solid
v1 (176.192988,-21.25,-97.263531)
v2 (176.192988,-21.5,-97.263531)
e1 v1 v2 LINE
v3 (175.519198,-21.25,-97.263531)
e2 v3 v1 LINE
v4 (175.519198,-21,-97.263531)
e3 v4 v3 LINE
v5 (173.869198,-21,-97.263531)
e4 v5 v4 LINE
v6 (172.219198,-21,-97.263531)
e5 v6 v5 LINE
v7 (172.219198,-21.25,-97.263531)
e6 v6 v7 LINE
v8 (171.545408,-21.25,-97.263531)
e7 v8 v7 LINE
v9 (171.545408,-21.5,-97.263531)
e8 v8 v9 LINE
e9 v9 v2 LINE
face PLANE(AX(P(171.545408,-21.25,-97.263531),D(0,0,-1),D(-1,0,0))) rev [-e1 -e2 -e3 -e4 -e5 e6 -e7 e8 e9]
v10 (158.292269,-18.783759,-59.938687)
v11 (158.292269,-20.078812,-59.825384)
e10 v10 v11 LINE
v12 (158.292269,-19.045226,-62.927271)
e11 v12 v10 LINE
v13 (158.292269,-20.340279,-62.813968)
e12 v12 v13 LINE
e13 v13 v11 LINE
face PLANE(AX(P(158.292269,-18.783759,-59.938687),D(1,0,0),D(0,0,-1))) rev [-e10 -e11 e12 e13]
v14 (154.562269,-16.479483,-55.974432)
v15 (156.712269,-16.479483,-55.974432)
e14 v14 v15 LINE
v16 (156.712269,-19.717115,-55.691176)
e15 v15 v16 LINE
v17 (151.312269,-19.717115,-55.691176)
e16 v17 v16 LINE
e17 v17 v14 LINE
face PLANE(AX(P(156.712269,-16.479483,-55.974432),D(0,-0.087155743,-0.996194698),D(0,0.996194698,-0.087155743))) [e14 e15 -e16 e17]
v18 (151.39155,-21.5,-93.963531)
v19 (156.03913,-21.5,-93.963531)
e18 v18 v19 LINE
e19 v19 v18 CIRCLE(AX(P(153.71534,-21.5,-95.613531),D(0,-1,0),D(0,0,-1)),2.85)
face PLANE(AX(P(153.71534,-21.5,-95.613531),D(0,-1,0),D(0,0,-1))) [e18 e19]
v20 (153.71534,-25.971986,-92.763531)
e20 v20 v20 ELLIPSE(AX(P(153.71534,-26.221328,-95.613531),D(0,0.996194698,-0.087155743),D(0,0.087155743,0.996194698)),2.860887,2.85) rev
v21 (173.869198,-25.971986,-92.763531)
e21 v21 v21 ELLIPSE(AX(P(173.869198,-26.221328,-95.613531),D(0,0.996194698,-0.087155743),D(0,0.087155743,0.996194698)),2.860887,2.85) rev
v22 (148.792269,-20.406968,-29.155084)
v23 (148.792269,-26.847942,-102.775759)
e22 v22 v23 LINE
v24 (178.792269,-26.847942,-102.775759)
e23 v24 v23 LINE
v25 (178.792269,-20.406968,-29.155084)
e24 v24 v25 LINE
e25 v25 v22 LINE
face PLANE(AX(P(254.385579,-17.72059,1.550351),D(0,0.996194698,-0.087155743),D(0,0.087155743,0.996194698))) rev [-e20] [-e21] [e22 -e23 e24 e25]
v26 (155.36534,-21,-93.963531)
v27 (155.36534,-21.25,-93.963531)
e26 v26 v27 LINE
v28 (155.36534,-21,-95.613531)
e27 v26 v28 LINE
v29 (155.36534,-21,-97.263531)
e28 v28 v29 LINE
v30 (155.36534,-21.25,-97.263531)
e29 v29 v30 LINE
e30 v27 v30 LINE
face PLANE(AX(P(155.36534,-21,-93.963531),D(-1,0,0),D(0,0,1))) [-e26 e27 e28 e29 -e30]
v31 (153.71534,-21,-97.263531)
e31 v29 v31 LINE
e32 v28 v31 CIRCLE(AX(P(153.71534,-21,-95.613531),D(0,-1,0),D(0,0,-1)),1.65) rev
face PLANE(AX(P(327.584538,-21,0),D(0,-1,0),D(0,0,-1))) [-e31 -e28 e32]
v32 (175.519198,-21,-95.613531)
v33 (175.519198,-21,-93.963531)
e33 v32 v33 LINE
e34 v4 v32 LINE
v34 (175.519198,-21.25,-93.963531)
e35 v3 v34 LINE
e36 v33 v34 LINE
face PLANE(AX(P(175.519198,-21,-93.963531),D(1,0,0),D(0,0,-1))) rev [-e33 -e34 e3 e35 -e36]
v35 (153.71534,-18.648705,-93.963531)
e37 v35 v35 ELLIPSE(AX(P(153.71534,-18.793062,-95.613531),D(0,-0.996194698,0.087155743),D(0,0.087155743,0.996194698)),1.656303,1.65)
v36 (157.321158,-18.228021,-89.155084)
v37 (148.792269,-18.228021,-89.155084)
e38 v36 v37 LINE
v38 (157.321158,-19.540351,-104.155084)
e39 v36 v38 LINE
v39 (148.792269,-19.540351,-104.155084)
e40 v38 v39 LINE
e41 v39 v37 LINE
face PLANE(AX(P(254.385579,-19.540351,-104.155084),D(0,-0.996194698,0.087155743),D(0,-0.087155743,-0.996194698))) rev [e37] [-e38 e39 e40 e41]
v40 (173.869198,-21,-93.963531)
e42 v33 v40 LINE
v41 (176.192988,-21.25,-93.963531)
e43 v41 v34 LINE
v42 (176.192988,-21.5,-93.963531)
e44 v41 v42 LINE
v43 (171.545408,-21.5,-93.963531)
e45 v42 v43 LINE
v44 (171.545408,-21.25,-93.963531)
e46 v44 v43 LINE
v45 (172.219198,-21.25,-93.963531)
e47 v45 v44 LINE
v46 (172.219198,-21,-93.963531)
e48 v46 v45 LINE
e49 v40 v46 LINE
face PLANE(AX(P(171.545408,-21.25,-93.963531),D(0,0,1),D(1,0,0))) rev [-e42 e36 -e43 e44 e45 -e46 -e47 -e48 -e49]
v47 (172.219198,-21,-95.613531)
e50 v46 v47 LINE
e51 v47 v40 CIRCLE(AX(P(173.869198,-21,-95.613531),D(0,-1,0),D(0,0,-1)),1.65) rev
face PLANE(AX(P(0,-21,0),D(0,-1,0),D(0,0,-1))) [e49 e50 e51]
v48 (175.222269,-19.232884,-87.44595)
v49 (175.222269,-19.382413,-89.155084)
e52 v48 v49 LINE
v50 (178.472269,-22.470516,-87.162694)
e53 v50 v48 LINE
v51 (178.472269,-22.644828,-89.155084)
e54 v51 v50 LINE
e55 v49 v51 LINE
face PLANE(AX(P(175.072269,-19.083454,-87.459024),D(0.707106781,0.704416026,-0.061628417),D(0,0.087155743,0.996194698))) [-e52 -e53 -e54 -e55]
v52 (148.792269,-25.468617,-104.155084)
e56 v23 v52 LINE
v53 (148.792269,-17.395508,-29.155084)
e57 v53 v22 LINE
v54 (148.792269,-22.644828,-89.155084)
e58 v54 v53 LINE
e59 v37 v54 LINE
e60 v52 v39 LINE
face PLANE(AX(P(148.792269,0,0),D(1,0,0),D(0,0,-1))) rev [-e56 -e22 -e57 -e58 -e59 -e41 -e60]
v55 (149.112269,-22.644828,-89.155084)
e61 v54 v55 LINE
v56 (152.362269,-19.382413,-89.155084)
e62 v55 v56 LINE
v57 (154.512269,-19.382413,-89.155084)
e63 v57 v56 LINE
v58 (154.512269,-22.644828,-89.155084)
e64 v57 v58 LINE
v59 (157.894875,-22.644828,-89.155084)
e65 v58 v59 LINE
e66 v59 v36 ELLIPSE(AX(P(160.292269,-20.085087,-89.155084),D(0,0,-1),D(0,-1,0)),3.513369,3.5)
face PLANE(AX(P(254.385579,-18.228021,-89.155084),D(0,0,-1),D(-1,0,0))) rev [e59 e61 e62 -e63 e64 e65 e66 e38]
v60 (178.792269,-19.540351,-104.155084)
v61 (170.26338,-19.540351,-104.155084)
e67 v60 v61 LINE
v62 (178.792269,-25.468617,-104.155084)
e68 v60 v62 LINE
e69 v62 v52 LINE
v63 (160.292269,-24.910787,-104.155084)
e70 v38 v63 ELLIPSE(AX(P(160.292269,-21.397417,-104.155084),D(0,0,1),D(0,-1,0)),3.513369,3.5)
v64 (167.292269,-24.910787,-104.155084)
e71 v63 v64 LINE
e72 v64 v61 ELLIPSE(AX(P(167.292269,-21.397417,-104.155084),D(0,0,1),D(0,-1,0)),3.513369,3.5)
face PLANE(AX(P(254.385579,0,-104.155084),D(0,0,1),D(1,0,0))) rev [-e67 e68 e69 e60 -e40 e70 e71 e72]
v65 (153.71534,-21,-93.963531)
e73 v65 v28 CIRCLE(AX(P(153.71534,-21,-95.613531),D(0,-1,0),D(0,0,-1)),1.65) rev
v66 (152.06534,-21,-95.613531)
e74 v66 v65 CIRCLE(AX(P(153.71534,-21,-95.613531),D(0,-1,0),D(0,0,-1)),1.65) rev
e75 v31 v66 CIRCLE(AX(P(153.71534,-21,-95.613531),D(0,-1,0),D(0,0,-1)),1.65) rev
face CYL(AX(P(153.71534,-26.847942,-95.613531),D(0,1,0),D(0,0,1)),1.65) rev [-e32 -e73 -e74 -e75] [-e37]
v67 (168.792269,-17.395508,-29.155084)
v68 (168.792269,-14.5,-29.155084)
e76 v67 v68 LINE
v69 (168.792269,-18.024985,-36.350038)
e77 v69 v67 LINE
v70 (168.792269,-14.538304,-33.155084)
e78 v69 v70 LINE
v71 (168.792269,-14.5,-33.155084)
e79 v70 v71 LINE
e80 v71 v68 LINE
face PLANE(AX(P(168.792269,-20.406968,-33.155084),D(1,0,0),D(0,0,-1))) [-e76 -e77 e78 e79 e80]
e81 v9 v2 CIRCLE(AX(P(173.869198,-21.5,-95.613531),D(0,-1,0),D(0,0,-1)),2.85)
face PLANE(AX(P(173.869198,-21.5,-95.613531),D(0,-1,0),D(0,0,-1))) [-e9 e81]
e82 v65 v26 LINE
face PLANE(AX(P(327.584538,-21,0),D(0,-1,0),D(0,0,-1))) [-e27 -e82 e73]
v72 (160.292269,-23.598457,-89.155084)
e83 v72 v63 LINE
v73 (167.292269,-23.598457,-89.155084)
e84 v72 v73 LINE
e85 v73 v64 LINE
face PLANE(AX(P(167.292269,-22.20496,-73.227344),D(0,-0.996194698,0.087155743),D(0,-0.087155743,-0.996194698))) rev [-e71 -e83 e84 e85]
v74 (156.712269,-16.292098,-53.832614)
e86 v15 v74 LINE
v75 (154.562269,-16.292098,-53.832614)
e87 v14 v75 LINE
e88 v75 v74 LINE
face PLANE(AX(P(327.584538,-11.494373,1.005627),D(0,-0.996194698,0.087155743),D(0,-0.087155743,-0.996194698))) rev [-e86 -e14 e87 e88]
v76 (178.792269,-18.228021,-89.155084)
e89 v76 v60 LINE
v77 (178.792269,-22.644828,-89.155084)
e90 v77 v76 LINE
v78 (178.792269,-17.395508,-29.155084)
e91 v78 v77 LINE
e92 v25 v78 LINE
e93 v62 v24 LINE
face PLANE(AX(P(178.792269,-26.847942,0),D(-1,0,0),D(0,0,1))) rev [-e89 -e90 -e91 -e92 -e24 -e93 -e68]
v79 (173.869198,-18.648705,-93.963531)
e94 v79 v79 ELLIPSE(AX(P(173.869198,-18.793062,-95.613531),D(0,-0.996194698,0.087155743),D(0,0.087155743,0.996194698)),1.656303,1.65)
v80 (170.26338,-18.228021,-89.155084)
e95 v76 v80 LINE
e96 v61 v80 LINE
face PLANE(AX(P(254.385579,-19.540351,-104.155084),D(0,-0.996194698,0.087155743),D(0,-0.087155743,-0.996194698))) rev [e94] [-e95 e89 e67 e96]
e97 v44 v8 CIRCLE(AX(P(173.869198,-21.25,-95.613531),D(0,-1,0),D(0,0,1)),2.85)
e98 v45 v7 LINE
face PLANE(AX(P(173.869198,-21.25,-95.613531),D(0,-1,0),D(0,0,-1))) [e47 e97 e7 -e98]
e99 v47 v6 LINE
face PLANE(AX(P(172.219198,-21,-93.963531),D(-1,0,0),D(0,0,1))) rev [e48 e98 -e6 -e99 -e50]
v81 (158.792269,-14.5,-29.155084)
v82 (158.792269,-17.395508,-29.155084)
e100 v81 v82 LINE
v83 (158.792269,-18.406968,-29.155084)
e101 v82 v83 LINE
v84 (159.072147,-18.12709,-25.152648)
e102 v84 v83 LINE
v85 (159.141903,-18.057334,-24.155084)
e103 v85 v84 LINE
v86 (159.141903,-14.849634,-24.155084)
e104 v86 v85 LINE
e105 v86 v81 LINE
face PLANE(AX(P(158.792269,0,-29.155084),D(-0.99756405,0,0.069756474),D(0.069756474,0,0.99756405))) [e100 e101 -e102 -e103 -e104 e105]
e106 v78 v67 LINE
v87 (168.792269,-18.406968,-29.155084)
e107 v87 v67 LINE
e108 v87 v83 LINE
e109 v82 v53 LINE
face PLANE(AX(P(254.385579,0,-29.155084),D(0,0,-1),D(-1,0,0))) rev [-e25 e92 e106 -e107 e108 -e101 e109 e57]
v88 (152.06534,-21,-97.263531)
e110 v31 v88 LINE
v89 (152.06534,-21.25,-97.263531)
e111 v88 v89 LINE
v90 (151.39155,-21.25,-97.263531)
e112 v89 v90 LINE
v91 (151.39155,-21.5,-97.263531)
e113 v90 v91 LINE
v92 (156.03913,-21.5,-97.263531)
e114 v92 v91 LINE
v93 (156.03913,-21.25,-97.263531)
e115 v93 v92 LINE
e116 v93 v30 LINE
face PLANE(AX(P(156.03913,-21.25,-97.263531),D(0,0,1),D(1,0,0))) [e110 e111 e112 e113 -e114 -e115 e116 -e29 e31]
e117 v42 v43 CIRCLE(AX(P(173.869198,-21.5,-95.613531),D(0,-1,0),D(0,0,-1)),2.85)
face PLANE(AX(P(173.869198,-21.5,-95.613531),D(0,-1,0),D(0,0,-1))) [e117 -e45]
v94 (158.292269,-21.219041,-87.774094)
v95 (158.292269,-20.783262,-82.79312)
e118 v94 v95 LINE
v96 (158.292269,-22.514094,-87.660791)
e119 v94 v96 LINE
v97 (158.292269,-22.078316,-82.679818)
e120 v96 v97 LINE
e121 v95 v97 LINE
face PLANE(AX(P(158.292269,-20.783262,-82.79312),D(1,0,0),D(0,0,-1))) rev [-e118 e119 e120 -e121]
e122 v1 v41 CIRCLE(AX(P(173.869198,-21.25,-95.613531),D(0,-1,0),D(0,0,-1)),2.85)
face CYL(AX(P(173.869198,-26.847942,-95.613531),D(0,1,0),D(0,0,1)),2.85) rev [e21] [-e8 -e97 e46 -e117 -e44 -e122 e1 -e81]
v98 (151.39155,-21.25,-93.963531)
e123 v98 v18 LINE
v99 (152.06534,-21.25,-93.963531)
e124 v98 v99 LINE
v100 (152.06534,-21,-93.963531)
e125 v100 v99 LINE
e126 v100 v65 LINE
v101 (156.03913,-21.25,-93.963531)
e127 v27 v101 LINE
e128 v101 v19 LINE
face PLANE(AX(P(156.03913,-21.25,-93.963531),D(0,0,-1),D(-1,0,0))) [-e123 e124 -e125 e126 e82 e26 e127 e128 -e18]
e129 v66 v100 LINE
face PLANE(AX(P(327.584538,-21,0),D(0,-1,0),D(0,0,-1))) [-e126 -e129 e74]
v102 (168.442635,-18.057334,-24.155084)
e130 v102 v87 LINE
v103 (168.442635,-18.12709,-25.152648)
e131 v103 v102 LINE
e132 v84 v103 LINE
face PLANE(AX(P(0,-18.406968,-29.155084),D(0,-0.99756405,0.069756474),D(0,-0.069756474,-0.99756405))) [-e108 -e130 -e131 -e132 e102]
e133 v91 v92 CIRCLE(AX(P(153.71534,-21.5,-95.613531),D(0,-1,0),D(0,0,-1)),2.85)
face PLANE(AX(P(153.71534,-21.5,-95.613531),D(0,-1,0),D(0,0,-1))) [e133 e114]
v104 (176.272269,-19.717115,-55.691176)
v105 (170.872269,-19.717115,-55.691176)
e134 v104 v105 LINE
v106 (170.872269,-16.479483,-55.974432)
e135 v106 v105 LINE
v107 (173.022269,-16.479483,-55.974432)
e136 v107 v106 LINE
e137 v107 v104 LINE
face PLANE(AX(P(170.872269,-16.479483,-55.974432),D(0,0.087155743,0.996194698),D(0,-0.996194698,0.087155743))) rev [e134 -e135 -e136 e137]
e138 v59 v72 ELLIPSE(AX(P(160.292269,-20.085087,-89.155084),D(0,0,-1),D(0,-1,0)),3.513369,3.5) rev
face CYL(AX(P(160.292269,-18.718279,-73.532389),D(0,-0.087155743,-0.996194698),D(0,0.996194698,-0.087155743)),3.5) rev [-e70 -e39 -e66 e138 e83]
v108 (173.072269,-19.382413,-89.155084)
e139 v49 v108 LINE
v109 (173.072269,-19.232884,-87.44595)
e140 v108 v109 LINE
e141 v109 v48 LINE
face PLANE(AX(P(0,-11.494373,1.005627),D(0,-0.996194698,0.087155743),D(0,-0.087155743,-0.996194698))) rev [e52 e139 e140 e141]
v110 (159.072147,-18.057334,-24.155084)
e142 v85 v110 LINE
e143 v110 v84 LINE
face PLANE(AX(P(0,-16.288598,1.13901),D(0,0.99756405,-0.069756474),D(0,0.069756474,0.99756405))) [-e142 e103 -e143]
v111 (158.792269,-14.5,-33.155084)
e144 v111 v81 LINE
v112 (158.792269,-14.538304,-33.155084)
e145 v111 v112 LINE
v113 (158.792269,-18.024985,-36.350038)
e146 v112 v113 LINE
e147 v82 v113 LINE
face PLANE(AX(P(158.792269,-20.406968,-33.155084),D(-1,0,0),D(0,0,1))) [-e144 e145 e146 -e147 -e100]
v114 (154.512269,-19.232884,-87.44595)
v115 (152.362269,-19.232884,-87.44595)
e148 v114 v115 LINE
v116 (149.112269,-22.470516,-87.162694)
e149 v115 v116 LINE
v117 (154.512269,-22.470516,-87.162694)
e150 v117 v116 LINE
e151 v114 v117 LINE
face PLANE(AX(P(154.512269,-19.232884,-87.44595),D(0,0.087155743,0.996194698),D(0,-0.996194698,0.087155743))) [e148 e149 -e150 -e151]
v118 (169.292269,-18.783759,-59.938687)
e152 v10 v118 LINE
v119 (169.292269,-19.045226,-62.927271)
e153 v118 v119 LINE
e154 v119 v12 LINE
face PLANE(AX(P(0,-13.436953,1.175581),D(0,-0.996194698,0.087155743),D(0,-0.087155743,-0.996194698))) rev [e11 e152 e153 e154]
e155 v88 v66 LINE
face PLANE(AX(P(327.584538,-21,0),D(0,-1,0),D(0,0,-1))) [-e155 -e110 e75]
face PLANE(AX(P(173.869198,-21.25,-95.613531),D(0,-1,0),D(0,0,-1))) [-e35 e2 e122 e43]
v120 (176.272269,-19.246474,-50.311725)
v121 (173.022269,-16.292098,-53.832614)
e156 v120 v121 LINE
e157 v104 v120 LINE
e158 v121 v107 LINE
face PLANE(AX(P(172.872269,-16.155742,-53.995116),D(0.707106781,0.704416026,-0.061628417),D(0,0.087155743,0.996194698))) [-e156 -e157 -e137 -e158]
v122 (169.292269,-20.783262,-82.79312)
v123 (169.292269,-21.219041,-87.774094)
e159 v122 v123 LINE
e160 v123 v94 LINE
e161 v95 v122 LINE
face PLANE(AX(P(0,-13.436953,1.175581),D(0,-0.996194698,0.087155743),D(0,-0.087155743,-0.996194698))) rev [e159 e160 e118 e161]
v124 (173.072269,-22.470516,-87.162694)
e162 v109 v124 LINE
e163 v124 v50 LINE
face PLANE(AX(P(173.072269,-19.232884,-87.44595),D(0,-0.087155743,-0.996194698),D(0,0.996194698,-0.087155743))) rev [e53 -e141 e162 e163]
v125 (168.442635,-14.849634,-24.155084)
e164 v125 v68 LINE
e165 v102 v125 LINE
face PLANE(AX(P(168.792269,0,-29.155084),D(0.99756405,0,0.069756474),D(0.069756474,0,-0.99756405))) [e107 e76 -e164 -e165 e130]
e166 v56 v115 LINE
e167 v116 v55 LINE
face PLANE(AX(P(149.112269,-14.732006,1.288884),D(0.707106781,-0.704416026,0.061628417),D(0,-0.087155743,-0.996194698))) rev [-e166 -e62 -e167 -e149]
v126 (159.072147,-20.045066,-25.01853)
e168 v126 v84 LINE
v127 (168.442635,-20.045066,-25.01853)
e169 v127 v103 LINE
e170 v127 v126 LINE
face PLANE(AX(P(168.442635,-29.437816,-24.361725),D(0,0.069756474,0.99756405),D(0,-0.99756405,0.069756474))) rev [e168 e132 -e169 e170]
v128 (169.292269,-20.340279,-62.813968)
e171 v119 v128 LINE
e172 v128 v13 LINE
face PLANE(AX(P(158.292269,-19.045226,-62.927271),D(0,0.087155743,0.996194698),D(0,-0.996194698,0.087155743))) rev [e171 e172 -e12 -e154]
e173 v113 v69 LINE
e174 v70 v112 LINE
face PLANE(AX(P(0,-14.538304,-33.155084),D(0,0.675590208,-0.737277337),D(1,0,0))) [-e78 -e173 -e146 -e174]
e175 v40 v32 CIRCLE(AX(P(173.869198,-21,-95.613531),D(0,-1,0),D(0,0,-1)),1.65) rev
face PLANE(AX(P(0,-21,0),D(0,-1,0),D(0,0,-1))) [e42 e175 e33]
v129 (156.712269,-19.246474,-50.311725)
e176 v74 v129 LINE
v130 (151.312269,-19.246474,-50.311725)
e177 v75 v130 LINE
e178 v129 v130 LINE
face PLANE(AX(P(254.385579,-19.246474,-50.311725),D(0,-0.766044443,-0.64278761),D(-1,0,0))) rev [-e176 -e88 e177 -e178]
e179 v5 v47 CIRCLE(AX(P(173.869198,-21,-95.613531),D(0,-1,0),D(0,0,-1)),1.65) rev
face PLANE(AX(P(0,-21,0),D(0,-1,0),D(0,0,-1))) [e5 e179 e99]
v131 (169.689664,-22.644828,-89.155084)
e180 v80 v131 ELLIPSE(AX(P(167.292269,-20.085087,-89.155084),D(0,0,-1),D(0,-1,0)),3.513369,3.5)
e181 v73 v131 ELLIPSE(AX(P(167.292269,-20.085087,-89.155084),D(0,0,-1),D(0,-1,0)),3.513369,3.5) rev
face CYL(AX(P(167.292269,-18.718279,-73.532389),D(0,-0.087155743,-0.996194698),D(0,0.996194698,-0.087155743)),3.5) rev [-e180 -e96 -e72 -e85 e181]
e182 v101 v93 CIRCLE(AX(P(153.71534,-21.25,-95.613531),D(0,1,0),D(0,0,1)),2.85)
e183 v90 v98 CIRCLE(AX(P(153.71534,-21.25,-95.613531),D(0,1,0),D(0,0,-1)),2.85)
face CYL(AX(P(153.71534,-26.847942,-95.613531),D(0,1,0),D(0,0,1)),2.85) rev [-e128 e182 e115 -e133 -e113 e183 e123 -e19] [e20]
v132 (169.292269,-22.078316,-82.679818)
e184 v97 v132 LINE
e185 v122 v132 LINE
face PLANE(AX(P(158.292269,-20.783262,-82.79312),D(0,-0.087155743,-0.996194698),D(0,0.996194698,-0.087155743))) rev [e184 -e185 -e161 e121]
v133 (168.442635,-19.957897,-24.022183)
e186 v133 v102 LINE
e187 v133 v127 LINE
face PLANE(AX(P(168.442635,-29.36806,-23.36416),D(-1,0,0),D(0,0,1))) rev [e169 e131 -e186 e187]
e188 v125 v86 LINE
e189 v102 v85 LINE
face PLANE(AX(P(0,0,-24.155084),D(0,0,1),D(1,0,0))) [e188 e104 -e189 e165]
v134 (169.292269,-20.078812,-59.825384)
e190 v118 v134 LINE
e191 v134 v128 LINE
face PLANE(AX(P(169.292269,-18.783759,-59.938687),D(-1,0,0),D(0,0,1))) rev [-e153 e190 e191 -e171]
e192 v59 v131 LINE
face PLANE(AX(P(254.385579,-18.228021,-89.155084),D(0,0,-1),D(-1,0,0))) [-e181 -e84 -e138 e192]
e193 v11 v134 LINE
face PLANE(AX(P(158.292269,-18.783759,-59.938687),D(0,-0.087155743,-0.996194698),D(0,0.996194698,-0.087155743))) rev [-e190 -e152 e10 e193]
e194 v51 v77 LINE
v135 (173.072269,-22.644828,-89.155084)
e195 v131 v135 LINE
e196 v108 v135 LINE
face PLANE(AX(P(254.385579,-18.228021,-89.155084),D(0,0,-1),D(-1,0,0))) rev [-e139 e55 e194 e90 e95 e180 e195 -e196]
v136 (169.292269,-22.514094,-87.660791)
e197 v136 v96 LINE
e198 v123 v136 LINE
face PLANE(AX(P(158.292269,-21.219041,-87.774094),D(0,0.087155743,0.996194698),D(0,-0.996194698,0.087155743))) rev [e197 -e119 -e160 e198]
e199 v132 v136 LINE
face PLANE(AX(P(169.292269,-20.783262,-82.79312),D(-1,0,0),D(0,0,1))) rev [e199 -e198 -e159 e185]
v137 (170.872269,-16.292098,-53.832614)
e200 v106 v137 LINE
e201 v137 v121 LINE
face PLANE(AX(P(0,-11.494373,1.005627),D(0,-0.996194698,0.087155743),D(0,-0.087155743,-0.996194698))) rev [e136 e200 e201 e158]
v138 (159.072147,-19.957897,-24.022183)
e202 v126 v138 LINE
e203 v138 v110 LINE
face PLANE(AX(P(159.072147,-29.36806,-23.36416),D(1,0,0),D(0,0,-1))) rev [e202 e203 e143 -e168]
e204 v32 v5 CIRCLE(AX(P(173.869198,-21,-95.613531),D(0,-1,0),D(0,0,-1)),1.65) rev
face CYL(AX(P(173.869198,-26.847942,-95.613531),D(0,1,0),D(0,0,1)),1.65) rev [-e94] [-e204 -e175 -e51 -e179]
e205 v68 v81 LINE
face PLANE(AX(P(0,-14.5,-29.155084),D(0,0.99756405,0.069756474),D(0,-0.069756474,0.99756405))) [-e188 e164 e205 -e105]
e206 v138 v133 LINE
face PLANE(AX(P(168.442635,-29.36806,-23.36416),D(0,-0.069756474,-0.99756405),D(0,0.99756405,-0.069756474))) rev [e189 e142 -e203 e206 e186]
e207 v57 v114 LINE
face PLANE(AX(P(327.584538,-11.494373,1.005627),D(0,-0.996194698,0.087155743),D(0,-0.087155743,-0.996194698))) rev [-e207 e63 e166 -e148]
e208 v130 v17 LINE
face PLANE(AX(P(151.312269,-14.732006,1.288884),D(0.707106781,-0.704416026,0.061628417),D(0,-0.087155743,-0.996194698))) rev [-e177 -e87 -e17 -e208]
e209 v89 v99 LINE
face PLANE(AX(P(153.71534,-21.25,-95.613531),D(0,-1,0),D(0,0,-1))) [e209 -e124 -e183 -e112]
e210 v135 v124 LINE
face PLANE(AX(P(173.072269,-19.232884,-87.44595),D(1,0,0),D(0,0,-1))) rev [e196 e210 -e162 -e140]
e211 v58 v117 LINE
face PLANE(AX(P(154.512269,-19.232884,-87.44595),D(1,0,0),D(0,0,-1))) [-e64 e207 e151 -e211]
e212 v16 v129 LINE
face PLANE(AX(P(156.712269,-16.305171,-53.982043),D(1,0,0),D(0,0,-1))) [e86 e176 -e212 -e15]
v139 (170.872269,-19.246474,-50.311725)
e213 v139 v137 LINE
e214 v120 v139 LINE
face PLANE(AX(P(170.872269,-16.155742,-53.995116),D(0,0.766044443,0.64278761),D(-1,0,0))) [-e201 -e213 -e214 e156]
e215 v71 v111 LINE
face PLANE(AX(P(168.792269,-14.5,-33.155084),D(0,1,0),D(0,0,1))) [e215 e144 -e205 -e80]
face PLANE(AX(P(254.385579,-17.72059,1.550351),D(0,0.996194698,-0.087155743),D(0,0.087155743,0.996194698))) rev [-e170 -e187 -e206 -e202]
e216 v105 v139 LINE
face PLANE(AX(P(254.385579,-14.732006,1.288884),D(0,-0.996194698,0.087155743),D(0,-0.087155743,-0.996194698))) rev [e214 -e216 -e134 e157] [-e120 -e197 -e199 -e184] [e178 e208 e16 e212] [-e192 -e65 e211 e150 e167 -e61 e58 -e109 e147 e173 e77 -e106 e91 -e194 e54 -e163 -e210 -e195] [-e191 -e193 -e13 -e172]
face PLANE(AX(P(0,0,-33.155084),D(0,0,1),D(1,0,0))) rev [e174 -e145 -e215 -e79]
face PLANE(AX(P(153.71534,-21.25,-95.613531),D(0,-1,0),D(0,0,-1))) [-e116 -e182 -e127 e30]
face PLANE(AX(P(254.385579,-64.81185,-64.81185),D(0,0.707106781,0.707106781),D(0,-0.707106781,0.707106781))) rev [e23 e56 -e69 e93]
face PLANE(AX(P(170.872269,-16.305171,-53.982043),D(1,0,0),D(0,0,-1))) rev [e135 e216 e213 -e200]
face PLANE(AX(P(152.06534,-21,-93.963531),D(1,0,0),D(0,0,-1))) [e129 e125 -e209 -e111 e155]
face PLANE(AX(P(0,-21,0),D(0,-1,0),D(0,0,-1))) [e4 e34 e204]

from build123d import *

# Parameters (mm, degrees)
BOSS_EXTRUDE2_DEPTH = 30
CUT_EXTRUDE1_REACH  = 197.235
CUT_EXTRUDE2_START  = 7
SKETCH6_R           = 2.85
CUT_EXTRUDE2_DEPTH  = 201.285862098
SKETCH7_R           = 1.65
CUT_EXTRUDE3_DEPTH  = 209.121088475
SKETCH9_W           = 10
SKETCH9_H           = 5.906967626
BOSS_EXTRUDE4_DEPTH = 4
SKETCH10_W          = 10
SKETCH10_H          = 3.906967626
BOSS_EXTRUDE5_DEPTH = 5
BOSS_EXTRUDE5_TAPER = 4
FILLET1_SIZE        = 3.5
CUT_EXTRUDE4_START  = -0.25
CUT_EXTRUDE4_DEPTH  = 0.25
SKETCH12_W          = 3.3
SKETCH12_H          = 3.3
CUT_EXTRUDE5_DEPTH  = 0.25
SKETCH13_W          = 2
SKETCH13_H          = 2
BOSS_EXTRUDE6_DEPTH = 3.25
BOSS_EXTRUDE7_REACH = 209.762
SKETCH14_W          = 9.370488354
SKETCH14_H          = 1
SKETCH17_W          = 11
SKETCH17_H          = 5
SKETCH17_H_2        = 3
BOSS_EXTRUDE8_DEPTH = 1.3


with BuildPart() as part:
    # Sketch2 → Boss-Extrude2 (new body)
    with BuildSketch(Plane(origin=(148.792269218, 0, 0), x_dir=(0, 0, -1), z_dir=(1, 0, 0))):
        Polygon((89.155083501, -18.22802064), (89.155083501, -22.644827925), (29.155083501, -17.395508114), (29.155083501, -20.406967626), (102.775758778, -26.847942114), (104.155083501, -25.468617391), (104.155083501, -19.540350593), align=None)
    extrude(amount=BOSS_EXTRUDE2_DEPTH)

    # Cut-Extrude1: up to this plane
    cut_extrude1_end = Plane(origin=(254.385579164, -18.22802064, -89.155083501), z_dir=(0, 0, -1))
    # Sketch4 → Cut-Extrude1 (cut, up to the surface)
    with BuildSketch(Plane(origin=(0, -9.236632985, -105.575198123), x_dir=(-1, 0, 0), z_dir=(0, -0.0871557427476512, -0.9961946980917462)), mode=Mode.PRIVATE) as cut_extrude1_sk1:
        with BuildLine():
            Line((-167.292269218, -8.738279996), (-160.292269218, -8.738279996))
            ThreePointArc((-160.292269218, -8.738279996), (-156.792269218, -12.238279996), (-160.292269218, -15.738279996))
            Line((-160.292269218, -15.738279996), (-167.292269218, -15.738279996))
            ThreePointArc((-167.292269218, -15.738279996), (-170.792269218, -12.238279996), (-167.292269218, -8.738279996))
        make_face()
    cut_extrude1_tool1 = split(extrude(cut_extrude1_sk1.sketch, amount=-CUT_EXTRUDE1_REACH, mode=Mode.PRIVATE), bisect_by=cut_extrude1_end, keep=Keep.BOTH, mode=Mode.PRIVATE)
    add(cut_extrude1_tool1.solids().sort_by_distance((163.792269, -21.428343, -104.508562))[0], mode=Mode.SUBTRACT)

    # Sketch6 → Cut-Extrude2 (cut, through all)
    with BuildSketch(Plane(origin=(0, -14.5, 0), x_dir=(-1, 0, 0), z_dir=(0, -1, 0)).offset(CUT_EXTRUDE2_START)):
        with Locations(Location((-173.869198237, 95.613531365, 0), (0, 0, 270))):
            Circle(SKETCH6_R)
        with Locations(Location((-153.7153402, 95.613531365, 0), (0, 0, 270))):
            Circle(SKETCH6_R)
    extrude(amount=CUT_EXTRUDE2_DEPTH, mode=Mode.SUBTRACT)

    # Sketch7 → Cut-Extrude3 (cut, through all)
    with BuildSketch(Plane(origin=(0, -4.5, 0), x_dir=(1, 0, 0), z_dir=(0, 1, 0))):
        with Locations(Location((173.869198237, 95.613531365, 0), (0, 0, 270))):
            Circle(SKETCH7_R)
        with Locations(Location((153.7153402, 95.613531365, 0), (0, 0, 270))):
            Circle(SKETCH7_R)
    extrude(amount=-CUT_EXTRUDE3_DEPTH, mode=Mode.SUBTRACT)

    # Sketch9 → Boss-Extrude4 (add)
    with BuildSketch(Plane.XY.offset(-29.155083501)):
        with Locations((163.792269218, -17.453483813)):
            Rectangle(SKETCH9_W, SKETCH9_H)
    extrude(amount=-BOSS_EXTRUDE4_DEPTH)

    # Sketch10 → Boss-Extrude5 (add)
    with BuildSketch(Plane.XY.offset(-29.155083501)):
        with Locations((163.792269218, -16.453483813)):
            Rectangle(SKETCH10_W, SKETCH10_H)
    extrude(amount=BOSS_EXTRUDE5_DEPTH, taper=BOSS_EXTRUDE5_TAPER)

    # Fillet1
    # the kernel refuses this chamfer: 3.5 mm, written as the material it adds along each edge
    with BuildSketch(Plane(origin=(158.792269218, -17.745462768, -33.155083501), x_dir=(0, -0.11557140669619721, -0.9932991744455757), z_dir=(1, 0, 0))) as fillet1_piece_1:
        Polygon((FILLET1_SIZE * 0.915957386947, FILLET1_SIZE * 0.0261703223739), (-FILLET1_SIZE * 0.105901682781, FILLET1_SIZE * 0.91019099867), (0, 0), align=None)
    extrude(amount=10)

    # Sketch11 → Cut-Extrude4 (cut)
    with BuildSketch(Plane.XZ.offset(21.5).offset(CUT_EXTRUDE4_START)):
        with BuildLine():
            Line((171.545408229, -97.263531365), (176.192988244, -97.263531365))
            ThreePointArc((176.192988244, -97.263531365), (176.719198237, -95.613531365), (176.192988244, -93.963531365))
            Line((176.192988244, -93.963531365), (171.545408229, -93.963531365))
            ThreePointArc((171.545408229, -93.963531365), (171.019198237, -95.613531365), (171.545408229, -97.263531365))
        make_face()
    cut_extrude4 = extrude(amount=CUT_EXTRUDE4_DEPTH, mode=Mode.SUBTRACT)

    # Sketch12 → Cut-Extrude5 (cut)
    with BuildSketch(Plane.XZ.offset(21.25)):
        with Locations((173.869198237, -95.613531365)):
            Rectangle(SKETCH12_W, SKETCH12_H)
    cut_extrude5 = extrude(amount=-CUT_EXTRUDE5_DEPTH, mode=Mode.SUBTRACT)

    # Mirror1: Cut-Extrude4, Cut-Extrude5 across plane
    add(cut_extrude4.mirror(Plane(origin=(163.792269218, 0, 0), x_dir=(0, 0, 1), z_dir=(1, 0, 0))), mode=Mode.SUBTRACT)
    add(cut_extrude5.mirror(Plane(origin=(163.792269218, 0, 0), x_dir=(0, 0, 1), z_dir=(1, 0, 0))), mode=Mode.SUBTRACT)

    # Sketch13 → Boss-Extrude6 (add)
    with BuildSketch(Plane(origin=(0, -14.732006126, 1.288883527), x_dir=(1, 0, 0), z_dir=(0, 0.9961946980917463, -0.08715574274765082))):
        with Locations((171.872269218, 56.19771425)):
            Rectangle(SKETCH13_W, SKETCH13_H)
        with Locations((174.072269218, 89.789448289)):
            Rectangle(SKETCH13_W, SKETCH13_H)
    boss_extrude6 = extrude(amount=BOSS_EXTRUDE6_DEPTH)

    # Chamfer1
    # the kernel refuses this chamfer: 3.4 mm, written as the material it adds along each edge
    with BuildSketch(Plane(origin=(170.872269218, -19.542803909, -53.698786756), x_dir=(0, 0.059731544136399986, 0.9982144772718343), z_dir=(1, 0, 0))) as chamfer1_piece_1_section:
        with BuildLine():
            Line((3.497488864, 0), (-0.192260327, -3.492200498))
            Line((-0.192260327, -3.492200498), (-0.260234617, -3.490330778))
            ThreePointArc((-0.260234617, -3.490330778), (-0.116039372, -1.745552621), (-0.06797429, 0.00186972))
            Line((-0.06797429, 0.00186972), (0.00186972, 0.06797429))
            ThreePointArc((0.00186972, 0.06797429), (1.74929206, 0.019909209), (3.499358583, 0.06797429))
            Line((3.499358583, 0.06797429), (3.497488864, 0))
        make_face()
    chamfer1_piece_1 = extrude(amount=2, mode=Mode.PRIVATE)
    chamfer1_piece_1 = split(chamfer1_piece_1, bisect_by=Plane(origin=(171.872269218, -16.206722557, -52.85677046), z_dir=(0, -0.9961946980917463, 0.08715574274765082)), keep=Keep.TOP, mode=Mode.PRIVATE)
    add(chamfer1_piece_1)
    with BuildSketch(Plane(origin=(172.872269218, -19.542803909, -53.698786756), x_dir=(0.999621916911297, -0.027391246498838125, 0.002396423548492289), z_dir=(0, -0.08715574274765082, -0.9961946980917463))) as chamfer1_piece_2_section:
        with BuildLine():
            Line((3.497488864, 0), (-0.192260327, -3.492200498))
            Line((-0.192260327, -3.492200498), (-0.260234617, -3.490330778))
            ThreePointArc((-0.260234617, -3.490330778), (-0.116039372, -1.745552621), (-0.06797429, 0.00186972))
            Line((-0.06797429, 0.00186972), (0.00186972, 0.06797429))
            ThreePointArc((0.00186972, 0.06797429), (1.74929206, 0.019909209), (3.499358583, 0.06797429))
            Line((3.499358583, 0.06797429), (3.497488864, 0))
        make_face()
    chamfer1_piece_2 = extrude(amount=2, mode=Mode.PRIVATE)
    chamfer1_piece_2 = split(chamfer1_piece_2, bisect_by=Plane(origin=(174.001840036, -16.392326883, -54.978237618), z_dir=(0, -0.9961946980917463, 0.08715574274765082)), keep=Keep.TOP, mode=Mode.PRIVATE)
    add(chamfer1_piece_2)
    with BuildSketch(Plane(origin=(175.072269218, -22.47051644, -87.162694105), x_dir=(0.9996219169112963, -0.027391246498863667, 0.0023964235484945228), z_dir=(0, -0.08715574274765082, -0.9961946980917463))) as chamfer1_piece_3_section:
        with BuildLine():
            Line((3.497488864, 0), (-0.192260327, -3.492200498))
            Line((-0.192260327, -3.492200498), (-0.260234617, -3.490330778))
            ThreePointArc((-0.260234617, -3.490330778), (-0.116039372, -1.745552621), (-0.06797429, 0.00186972))
            Line((-0.06797429, 0.00186972), (0.00186972, 0.06797429))
            ThreePointArc((0.00186972, 0.06797429), (1.74929206, 0.019909209), (3.499358583, 0.06797429))
            Line((3.499358583, 0.06797429), (3.497488864, 0))
        make_face()
    chamfer1_piece_3 = extrude(amount=10.743722159, mode=Mode.PRIVATE)
    chamfer1_piece_3 = split(chamfer1_piece_3, bisect_by=Plane(origin=(176.219153997, -21.484451045, -89.155083501), z_dir=(0, 0, 1)), keep=Keep.TOP, mode=Mode.PRIVATE)
    chamfer1_piece_3 = split(chamfer1_piece_3, bisect_by=Plane(origin=(176.219153997, -19.315947713, -88.395376614), z_dir=(0, -0.9961946980917463, 0.08715574274765082)), keep=Keep.TOP, mode=Mode.PRIVATE)
    add(chamfer1_piece_3)
    with BuildSketch(Plane(origin=(172.872269218, -18.78073831, -44.988337099), x_dir=(0.9996219169112966, -0.027391246498851222, 0.0023964235484934342), z_dir=(0, -0.08715574274765082, -0.9961946980917463))) as chamfer1_piece_4a_section:
        with BuildLine():
            Line((3.497488864, 0), (-0.192260327, -3.492200498))
            Line((-0.192260327, -3.492200498), (-0.260234617, -3.490330778))
            ThreePointArc((-0.260234617, -3.490330778), (-0.116039372, -1.745552621), (-0.06797429, 0.00186972))
            Line((-0.06797429, 0.00186972), (0.00186972, 0.06797429))
            ThreePointArc((0.00186972, 0.06797429), (1.74929206, 0.019909209), (3.499358583, 0.06797429))
            Line((3.499358583, 0.06797429), (3.497488864, 0))
        make_face()
    chamfer1_piece_4a = extrude(amount=10.743722159, mode=Mode.PRIVATE)
    chamfer1_piece_4a = split(chamfer1_piece_4a, bisect_by=Plane(origin=(174.001840036, -18.441436891, -53.795143884), z_dir=(0, 0.08715574274765084, 0.9961946980917462)), keep=Keep.TOP, mode=Mode.PRIVATE)
    chamfer1_piece_4a = split(chamfer1_piece_4a, bisect_by=Plane(origin=(174.001840036, -15.924138341, -49.626818091), z_dir=(0, -0.9961946980917463, 0.08715574274765082)), keep=Keep.TOP, mode=Mode.PRIVATE)
    with BuildSketch(Plane(origin=(170.872269218, -19.542803909, -53.698786756), x_dir=(0, 0.059731544136399986, 0.9982144772718343), z_dir=(1, 0, 0))) as chamfer1_piece_4b_section:
        with BuildLine():
            Line((3.497488864, 0), (-0.192260327, -3.492200498))
            Line((-0.192260327, -3.492200498), (-0.260234617, -3.490330778))
            ThreePointArc((-0.260234617, -3.490330778), (-0.116039372, -1.745552621), (-0.06797429, 0.00186972))
            Line((-0.06797429, 0.00186972), (0.00186972, 0.06797429))
            ThreePointArc((0.00186972, 0.06797429), (1.74929206, 0.019909209), (3.499358583, 0.06797429))
            Line((3.499358583, 0.06797429), (3.497488864, 0))
        make_face()
    chamfer1_piece_4b = extrude(amount=10.743722159, mode=Mode.PRIVATE)
    chamfer1_piece_4b = split(chamfer1_piece_4b, bisect_by=Plane(origin=(178.792269218, -18.342988307, -52.669871424), z_dir=(-1, 0, 0)), keep=Keep.TOP, mode=Mode.PRIVATE)
    chamfer1_piece_4b = split(chamfer1_piece_4b, bisect_by=Plane(origin=(172.872269218, -18.342988307, -52.669871424), z_dir=(1, 0, 0)), keep=Keep.TOP, mode=Mode.PRIVATE)
    chamfer1_piece_4b = split(chamfer1_piece_4b, bisect_by=Plane(origin=(175.832269218, -16.206722557, -52.85677046), z_dir=(0, -0.9961946980917463, 0.08715574274765082)), keep=Keep.TOP, mode=Mode.PRIVATE)
    chamfer1_piece_4 = chamfer1_piece_4a & chamfer1_piece_4b
    add(chamfer1_piece_4)

    # Mirror2: Boss-Extrude6 across plane
    add(boss_extrude6.mirror(Plane(origin=(163.792269218, 0, 0), x_dir=(0, 0, 1), z_dir=(1, 0, 0))))

    # Chamfer1 of Mirror2
    # the kernel refuses this chamfer: 3.4 mm, written as the material it adds along each edge
    with BuildSketch(Plane(origin=(156.712269218, -19.542803909, -53.698786756), x_dir=(0, 0.05973154413639897, 0.9982144772718343), z_dir=(-1, 0, 0))) as chamfer1_of_mirror2_piece_1_section:
        with BuildLine():
            Line((3.497488864, 0), (-0.192260327, 3.492200498))
            Line((-0.192260327, 3.492200498), (-0.260234617, 3.490330778))
            ThreePointArc((-0.260234617, 3.490330778), (-0.116039372, 1.745552621), (-0.06797429, -0.00186972))
            Line((-0.06797429, -0.00186972), (0.00186972, -0.06797429))
            ThreePointArc((0.00186972, -0.06797429), (1.74929206, -0.019909209), (3.499358583, -0.06797429))
            Line((3.499358583, -0.06797429), (3.497488864, 0))
        make_face()
    chamfer1_of_mirror2_piece_1 = extrude(amount=2, mode=Mode.PRIVATE)
    chamfer1_of_mirror2_piece_1 = split(chamfer1_of_mirror2_piece_1, bisect_by=Plane(origin=(155.712269218, -16.206722557, -52.85677046), z_dir=(0, -0.9961946980917463, 0.08715574274765082)), keep=Keep.TOP, mode=Mode.PRIVATE)
    add(chamfer1_of_mirror2_piece_1)
    with BuildSketch(Plane(origin=(154.712269218, -19.542803909, -53.698786756), x_dir=(-0.999621916911297, -0.027391246498838125, 0.002396423548492289), z_dir=(0, -0.08715574274765082, -0.9961946980917463))) as chamfer1_of_mirror2_piece_2_section:
        with BuildLine():
            Line((3.497488864, 0), (-0.192260327, 3.492200498))
            Line((-0.192260327, 3.492200498), (-0.260234617, 3.490330778))
            ThreePointArc((-0.260234617, 3.490330778), (-0.116039372, 1.745552621), (-0.06797429, -0.00186972))
            Line((-0.06797429, -0.00186972), (0.00186972, -0.06797429))
            ThreePointArc((0.00186972, -0.06797429), (1.74929206, -0.019909209), (3.499358583, -0.06797429))
            Line((3.499358583, -0.06797429), (3.497488864, 0))
        make_face()
    chamfer1_of_mirror2_piece_2 = extrude(amount=2, mode=Mode.PRIVATE)
    chamfer1_of_mirror2_piece_2 = split(chamfer1_of_mirror2_piece_2, bisect_by=Plane(origin=(153.582698401, -16.392326883, -54.978237618), z_dir=(0, -0.9961946980917463, 0.08715574274765082)), keep=Keep.TOP, mode=Mode.PRIVATE)
    add(chamfer1_of_mirror2_piece_2)
    with BuildSketch(Plane(origin=(152.512269218, -22.47051644, -87.162694105), x_dir=(-0.9996219169112963, -0.027391246498863667, 0.0023964235484945228), z_dir=(0, -0.08715574274765082, -0.9961946980917463))) as chamfer1_of_mirror2_piece_3_section:
        with BuildLine():
            Line((3.497488864, 0), (-0.192260327, 3.492200498))
            Line((-0.192260327, 3.492200498), (-0.260234617, 3.490330778))
            ThreePointArc((-0.260234617, 3.490330778), (-0.116039372, 1.745552621), (-0.06797429, -0.00186972))
            Line((-0.06797429, -0.00186972), (0.00186972, -0.06797429))
            ThreePointArc((0.00186972, -0.06797429), (1.74929206, -0.019909209), (3.499358583, -0.06797429))
            Line((3.499358583, -0.06797429), (3.497488864, 0))
        make_face()
    chamfer1_of_mirror2_piece_3 = extrude(amount=10.743722159, mode=Mode.PRIVATE)
    chamfer1_of_mirror2_piece_3 = split(chamfer1_of_mirror2_piece_3, bisect_by=Plane(origin=(151.365384439, -21.484451045, -89.155083501), z_dir=(0, 0, 1)), keep=Keep.TOP, mode=Mode.PRIVATE)
    chamfer1_of_mirror2_piece_3 = split(chamfer1_of_mirror2_piece_3, bisect_by=Plane(origin=(151.365384439, -19.315947713, -88.395376614), z_dir=(0, -0.9961946980917463, 0.08715574274765082)), keep=Keep.TOP, mode=Mode.PRIVATE)
    add(chamfer1_of_mirror2_piece_3)
    with BuildSketch(Plane(origin=(156.712269218, -19.542803909, -53.698786756), x_dir=(0, 0.05973154413639897, 0.9982144772718343), z_dir=(-1, 0, 0))) as chamfer1_of_mirror2_piece_4a_section:
        with BuildLine():
            Line((3.497488864, 0), (-0.192260327, 3.492200498))
            Line((-0.192260327, 3.492200498), (-0.260234617, 3.490330778))
            ThreePointArc((-0.260234617, 3.490330778), (-0.116039372, 1.745552621), (-0.06797429, -0.00186972))
            Line((-0.06797429, -0.00186972), (0.00186972, -0.06797429))
            ThreePointArc((0.00186972, -0.06797429), (1.74929206, -0.019909209), (3.499358583, -0.06797429))
            Line((3.499358583, -0.06797429), (3.497488864, 0))
        make_face()
    chamfer1_of_mirror2_piece_4a = extrude(amount=10.743722159, mode=Mode.PRIVATE)
    chamfer1_of_mirror2_piece_4a = split(chamfer1_of_mirror2_piece_4a, bisect_by=Plane(origin=(148.792269218, -18.342988307, -52.669871424), z_dir=(1, 0, 0)), keep=Keep.TOP, mode=Mode.PRIVATE)
    chamfer1_of_mirror2_piece_4a = split(chamfer1_of_mirror2_piece_4a, bisect_by=Plane(origin=(154.712269218, -18.342988307, -52.669871424), z_dir=(-1, 0, 0)), keep=Keep.TOP, mode=Mode.PRIVATE)
    chamfer1_of_mirror2_piece_4a = split(chamfer1_of_mirror2_piece_4a, bisect_by=Plane(origin=(151.752269218, -16.206722557, -52.85677046), z_dir=(0, -0.9961946980917463, 0.08715574274765082)), keep=Keep.TOP, mode=Mode.PRIVATE)
    with BuildSketch(Plane(origin=(154.712269218, -18.78073831, -44.988337099), x_dir=(-0.9996219169112966, -0.027391246498851222, 0.0023964235484934342), z_dir=(0, -0.08715574274765082, -0.9961946980917463))) as chamfer1_of_mirror2_piece_4b_section:
        with BuildLine():
            Line((3.497488864, 0), (-0.192260327, 3.492200498))
            Line((-0.192260327, 3.492200498), (-0.260234617, 3.490330778))
            ThreePointArc((-0.260234617, 3.490330778), (-0.116039372, 1.745552621), (-0.06797429, -0.00186972))
            Line((-0.06797429, -0.00186972), (0.00186972, -0.06797429))
            ThreePointArc((0.00186972, -0.06797429), (1.74929206, -0.019909209), (3.499358583, -0.06797429))
            Line((3.499358583, -0.06797429), (3.497488864, 0))
        make_face()
    chamfer1_of_mirror2_piece_4b = extrude(amount=10.743722159, mode=Mode.PRIVATE)
    chamfer1_of_mirror2_piece_4b = split(chamfer1_of_mirror2_piece_4b, bisect_by=Plane(origin=(153.582698401, -18.441436891, -53.795143884), z_dir=(0, 0.08715574274765084, 0.9961946980917462)), keep=Keep.TOP, mode=Mode.PRIVATE)
    chamfer1_of_mirror2_piece_4b = split(chamfer1_of_mirror2_piece_4b, bisect_by=Plane(origin=(153.582698401, -15.924138341, -49.626818091), z_dir=(0, -0.9961946980917463, 0.08715574274765082)), keep=Keep.TOP, mode=Mode.PRIVATE)
    chamfer1_of_mirror2_piece_4 = chamfer1_of_mirror2_piece_4a & chamfer1_of_mirror2_piece_4b
    add(chamfer1_of_mirror2_piece_4)

    # Boss-Extrude7: up to this plane
    boss_extrude7_end = Plane(origin=(254.385579164, -17.72059022, 1.550350755), z_dir=(0, 0.9961946980917462, -0.08715574274765119))
    # Sketch14 → Boss-Extrude7 (add, up to the surface)
    with BuildSketch(Plane(origin=(0, -16.288598265, 1.139009748), x_dir=(1, 0, 0), z_dir=(0, -0.9975640502598242, 0.06975647374412541)), mode=Mode.PRIVATE) as boss_extrude7_sk1:
        with Locations((163.757390981, -25.855858847)):
            Rectangle(SKETCH14_W, SKETCH14_H)
    boss_extrude7_tool1 = split(extrude(boss_extrude7_sk1.sketch, amount=BOSS_EXTRUDE7_REACH, mode=Mode.PRIVATE), bisect_by=boss_extrude7_end, keep=Keep.BOTH, mode=Mode.PRIVATE)
    add(boss_extrude7_tool1.solids().sort_by_distance((163.757391, -18.092212, -24.653866))[0])

    # Sketch17 → Boss-Extrude8 (add)
    with BuildSketch(Plane(origin=(0, -14.732006126, 1.288883527), x_dir=(1, 0, 0), z_dir=(0, 0.9961946980917461, -0.08715574274765119))):
        with Locations((163.792269218, 86.789448289)):
            Rectangle(SKETCH17_W, SKETCH17_H)
        with Locations((163.792269218, 62.84771425)):
            Rectangle(SKETCH17_W, SKETCH17_H_2)
    extrude(amount=BOSS_EXTRUDE8_DEPTH)


solid = part.part
